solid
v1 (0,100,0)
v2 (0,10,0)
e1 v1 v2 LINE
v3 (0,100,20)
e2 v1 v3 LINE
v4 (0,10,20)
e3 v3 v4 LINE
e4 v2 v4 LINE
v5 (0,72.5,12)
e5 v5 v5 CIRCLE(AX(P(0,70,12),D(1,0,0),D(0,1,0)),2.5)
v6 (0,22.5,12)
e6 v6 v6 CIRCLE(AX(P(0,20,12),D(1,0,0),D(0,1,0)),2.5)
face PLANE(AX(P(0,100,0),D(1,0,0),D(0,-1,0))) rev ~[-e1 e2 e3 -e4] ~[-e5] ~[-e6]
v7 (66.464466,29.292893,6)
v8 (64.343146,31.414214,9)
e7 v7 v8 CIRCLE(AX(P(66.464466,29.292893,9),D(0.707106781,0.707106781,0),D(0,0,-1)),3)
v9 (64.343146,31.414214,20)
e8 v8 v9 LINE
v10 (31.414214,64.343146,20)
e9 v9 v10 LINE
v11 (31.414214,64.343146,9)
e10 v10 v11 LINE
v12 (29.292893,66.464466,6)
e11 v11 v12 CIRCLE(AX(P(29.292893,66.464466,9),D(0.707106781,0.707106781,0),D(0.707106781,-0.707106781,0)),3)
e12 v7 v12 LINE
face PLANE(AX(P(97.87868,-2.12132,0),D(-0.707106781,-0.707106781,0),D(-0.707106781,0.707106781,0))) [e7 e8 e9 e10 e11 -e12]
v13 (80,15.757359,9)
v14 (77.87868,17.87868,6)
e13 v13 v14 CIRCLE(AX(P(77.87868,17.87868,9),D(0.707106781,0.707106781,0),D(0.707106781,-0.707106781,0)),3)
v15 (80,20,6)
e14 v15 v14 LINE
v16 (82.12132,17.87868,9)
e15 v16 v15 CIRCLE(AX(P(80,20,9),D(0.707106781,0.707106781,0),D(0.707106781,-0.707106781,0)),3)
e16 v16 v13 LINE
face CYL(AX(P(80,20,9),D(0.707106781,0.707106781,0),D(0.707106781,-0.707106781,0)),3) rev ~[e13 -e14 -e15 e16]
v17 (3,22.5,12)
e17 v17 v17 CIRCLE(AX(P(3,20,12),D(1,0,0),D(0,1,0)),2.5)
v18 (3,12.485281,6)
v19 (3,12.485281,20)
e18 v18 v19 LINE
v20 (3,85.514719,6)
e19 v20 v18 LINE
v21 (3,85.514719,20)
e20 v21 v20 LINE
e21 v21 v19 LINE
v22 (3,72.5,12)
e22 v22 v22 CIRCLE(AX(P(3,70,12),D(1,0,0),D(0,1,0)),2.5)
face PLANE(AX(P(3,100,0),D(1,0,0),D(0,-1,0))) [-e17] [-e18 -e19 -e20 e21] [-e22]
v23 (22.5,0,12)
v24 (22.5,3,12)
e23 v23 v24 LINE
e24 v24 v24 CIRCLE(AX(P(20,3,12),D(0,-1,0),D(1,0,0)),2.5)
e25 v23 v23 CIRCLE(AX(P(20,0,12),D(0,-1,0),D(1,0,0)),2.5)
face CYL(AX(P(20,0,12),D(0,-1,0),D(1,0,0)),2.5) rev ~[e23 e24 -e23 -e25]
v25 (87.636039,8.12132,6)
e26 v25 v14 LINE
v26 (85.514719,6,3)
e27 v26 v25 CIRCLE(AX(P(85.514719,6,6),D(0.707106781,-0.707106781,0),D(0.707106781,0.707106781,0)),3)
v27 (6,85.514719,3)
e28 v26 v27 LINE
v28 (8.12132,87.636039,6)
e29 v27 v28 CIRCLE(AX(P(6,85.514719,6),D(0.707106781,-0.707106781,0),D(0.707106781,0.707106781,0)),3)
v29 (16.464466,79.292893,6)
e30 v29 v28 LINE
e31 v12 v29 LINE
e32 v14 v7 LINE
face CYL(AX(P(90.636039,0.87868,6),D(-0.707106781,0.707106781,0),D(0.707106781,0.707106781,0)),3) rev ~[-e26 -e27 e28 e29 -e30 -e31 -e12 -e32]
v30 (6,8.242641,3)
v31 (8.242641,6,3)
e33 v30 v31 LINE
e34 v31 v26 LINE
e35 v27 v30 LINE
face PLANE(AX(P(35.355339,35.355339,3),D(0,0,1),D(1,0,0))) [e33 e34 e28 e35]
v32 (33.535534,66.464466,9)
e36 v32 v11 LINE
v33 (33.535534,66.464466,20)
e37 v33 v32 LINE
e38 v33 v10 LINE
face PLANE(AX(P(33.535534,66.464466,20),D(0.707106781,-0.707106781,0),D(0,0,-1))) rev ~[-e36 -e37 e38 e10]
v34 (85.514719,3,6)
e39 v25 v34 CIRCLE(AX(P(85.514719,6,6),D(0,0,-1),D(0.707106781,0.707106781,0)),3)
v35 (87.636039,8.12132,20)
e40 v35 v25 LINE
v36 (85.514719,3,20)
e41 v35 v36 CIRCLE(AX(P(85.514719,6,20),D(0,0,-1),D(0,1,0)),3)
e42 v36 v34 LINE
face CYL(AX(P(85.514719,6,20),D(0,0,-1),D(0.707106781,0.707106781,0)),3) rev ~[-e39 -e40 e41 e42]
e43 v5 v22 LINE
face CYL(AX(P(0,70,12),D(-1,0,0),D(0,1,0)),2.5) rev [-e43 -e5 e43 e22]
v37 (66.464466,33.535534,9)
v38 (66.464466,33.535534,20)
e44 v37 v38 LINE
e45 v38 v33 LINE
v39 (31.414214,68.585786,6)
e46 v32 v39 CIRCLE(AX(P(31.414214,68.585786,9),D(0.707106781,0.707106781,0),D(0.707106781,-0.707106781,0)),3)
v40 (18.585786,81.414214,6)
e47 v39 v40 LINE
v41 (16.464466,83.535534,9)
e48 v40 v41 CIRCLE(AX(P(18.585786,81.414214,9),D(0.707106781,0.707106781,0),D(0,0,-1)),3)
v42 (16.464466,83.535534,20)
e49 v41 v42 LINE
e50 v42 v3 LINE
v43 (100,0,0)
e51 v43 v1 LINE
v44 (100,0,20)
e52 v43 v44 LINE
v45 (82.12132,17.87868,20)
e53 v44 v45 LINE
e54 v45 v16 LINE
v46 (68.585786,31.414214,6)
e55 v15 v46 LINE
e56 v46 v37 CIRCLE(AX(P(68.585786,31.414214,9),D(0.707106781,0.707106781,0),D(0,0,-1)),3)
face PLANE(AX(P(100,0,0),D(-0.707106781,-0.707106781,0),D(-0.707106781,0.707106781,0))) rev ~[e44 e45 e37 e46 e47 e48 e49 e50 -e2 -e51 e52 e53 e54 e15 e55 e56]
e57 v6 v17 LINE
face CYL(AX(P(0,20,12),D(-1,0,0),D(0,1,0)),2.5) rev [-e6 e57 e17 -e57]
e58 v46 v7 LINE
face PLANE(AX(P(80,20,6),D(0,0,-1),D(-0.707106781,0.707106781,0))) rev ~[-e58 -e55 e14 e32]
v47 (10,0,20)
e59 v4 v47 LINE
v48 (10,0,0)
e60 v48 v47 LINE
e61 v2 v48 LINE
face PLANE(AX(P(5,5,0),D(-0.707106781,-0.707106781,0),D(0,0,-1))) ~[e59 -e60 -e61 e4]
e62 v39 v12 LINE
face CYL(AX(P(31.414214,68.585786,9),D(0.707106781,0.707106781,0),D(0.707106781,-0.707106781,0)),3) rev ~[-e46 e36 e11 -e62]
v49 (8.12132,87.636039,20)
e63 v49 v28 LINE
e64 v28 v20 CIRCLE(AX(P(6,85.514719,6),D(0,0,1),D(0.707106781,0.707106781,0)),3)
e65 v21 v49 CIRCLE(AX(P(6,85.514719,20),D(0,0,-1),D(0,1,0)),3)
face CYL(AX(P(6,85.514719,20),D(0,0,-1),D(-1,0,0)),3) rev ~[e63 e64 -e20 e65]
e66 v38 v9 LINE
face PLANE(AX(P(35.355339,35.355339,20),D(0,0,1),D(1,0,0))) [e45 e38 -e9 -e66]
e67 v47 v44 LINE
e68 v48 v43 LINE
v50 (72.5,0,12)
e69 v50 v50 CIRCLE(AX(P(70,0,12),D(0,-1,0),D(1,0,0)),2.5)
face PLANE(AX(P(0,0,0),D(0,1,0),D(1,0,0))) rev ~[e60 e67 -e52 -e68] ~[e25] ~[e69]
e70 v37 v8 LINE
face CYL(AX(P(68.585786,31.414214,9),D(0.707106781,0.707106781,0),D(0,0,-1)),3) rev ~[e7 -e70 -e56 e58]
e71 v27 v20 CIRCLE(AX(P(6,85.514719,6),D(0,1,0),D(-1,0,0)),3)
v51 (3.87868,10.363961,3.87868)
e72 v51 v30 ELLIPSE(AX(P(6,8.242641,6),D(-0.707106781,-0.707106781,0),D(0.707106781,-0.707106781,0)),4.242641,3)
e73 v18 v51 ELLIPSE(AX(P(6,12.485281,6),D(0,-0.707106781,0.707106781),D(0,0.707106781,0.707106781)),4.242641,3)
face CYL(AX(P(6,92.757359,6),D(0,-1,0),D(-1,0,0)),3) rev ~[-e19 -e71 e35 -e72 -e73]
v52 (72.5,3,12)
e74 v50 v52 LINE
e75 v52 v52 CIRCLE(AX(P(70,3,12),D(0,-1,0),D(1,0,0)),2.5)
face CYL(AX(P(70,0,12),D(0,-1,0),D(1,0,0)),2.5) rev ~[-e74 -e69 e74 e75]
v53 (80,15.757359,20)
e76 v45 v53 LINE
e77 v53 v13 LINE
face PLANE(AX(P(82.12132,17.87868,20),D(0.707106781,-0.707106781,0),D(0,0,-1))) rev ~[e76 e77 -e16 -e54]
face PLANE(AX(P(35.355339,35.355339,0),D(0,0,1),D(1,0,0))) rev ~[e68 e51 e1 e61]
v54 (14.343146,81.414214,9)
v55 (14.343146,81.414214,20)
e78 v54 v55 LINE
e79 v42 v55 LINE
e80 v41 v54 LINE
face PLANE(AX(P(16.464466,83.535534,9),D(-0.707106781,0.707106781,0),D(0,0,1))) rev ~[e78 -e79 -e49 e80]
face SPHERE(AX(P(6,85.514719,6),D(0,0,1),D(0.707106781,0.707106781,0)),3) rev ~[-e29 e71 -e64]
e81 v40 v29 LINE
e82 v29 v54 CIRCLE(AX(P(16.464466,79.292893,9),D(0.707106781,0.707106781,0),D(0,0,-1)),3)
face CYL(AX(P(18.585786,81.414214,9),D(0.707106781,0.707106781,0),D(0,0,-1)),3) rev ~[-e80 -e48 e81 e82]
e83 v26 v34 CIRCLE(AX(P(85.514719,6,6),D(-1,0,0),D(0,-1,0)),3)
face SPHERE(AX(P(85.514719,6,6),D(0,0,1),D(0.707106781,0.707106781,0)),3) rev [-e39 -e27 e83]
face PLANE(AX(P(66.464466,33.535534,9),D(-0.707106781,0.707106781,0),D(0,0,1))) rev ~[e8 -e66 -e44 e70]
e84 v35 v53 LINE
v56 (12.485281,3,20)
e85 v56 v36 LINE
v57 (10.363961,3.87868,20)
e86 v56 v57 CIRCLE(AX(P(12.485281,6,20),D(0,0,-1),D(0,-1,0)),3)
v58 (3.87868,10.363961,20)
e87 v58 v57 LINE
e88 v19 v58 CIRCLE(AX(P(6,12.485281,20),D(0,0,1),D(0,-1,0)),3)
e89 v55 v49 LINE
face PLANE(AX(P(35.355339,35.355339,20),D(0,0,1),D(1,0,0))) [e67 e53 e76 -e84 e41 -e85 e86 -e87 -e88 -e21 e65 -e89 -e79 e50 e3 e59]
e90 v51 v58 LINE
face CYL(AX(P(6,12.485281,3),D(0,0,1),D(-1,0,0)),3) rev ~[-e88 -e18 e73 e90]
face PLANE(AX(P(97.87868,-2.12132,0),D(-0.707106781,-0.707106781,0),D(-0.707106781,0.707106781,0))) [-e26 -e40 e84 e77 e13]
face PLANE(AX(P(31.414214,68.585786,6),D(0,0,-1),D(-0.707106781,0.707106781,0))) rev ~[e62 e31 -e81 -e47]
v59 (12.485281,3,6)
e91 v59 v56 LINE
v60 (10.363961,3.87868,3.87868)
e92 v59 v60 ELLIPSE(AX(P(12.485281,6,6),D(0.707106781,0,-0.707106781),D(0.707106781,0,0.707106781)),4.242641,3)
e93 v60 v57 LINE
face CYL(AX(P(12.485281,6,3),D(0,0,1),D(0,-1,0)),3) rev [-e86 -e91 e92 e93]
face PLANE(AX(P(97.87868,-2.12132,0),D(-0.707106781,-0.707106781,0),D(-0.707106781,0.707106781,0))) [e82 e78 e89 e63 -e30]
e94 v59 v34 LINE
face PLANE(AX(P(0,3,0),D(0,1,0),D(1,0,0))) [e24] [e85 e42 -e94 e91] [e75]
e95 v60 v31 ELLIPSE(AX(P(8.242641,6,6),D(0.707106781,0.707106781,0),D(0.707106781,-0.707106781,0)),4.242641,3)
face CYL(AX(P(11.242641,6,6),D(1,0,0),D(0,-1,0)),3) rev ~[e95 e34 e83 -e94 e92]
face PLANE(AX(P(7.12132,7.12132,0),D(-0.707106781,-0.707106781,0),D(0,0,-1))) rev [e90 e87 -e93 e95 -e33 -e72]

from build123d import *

# Parameters (mm, degrees)
F1_DEPTH  = 20
F2_SIZE   = 10
F3_T      = -3
F5_R      = 2.5
F6_DEPTH  = 3
F4_R      = 2.5
F7_DEPTH  = 3
F9_R      = 3
F10_DEPTH = 3


with BuildPart() as f1:
    # F0 (on Top) → F1 (new body)
    with BuildSketch(Plane.XY):
        Polygon((0, 100), (0, 0), (100, 0), align=None)
    extrude(amount=F1_DEPTH)

    # F2
    f2_edges = [f1.edges().sort_by_distance(p)[0] for p in [
        (0, 0, 10),
    ]]
    chamfer(f2_edges, length=F2_SIZE)

    # F3
    f3_openings = [f1.faces().sort_by_distance(p)[0] for p in [
        (33.636364, 33.636364, 20),
    ]]
    offset(amount=F3_T, openings=f3_openings)

    # F5 (on Front) → F6 (cut, through all)
    with BuildSketch(Plane.XZ):
        with Locations((20, 12)):
            Circle(F5_R)
        with Locations((70, 12)):
            Circle(F5_R)
    extrude(amount=-F6_DEPTH, mode=Mode.SUBTRACT)

    # F4 (on Right) → F7 (cut, through all)
    with BuildSketch(Plane.YZ):
        with Locations((20, 12)):
            Circle(F4_R)
        with Locations((70, 12)):
            Circle(F4_R)
    extrude(amount=F7_DEPTH, mode=Mode.SUBTRACT)

    # F9
    f9_edges = [f1.edges().sort_by_distance(p)[0] for p in [
        (3, 52, 3),
        (52, 3, 3),
        (92.757359, 3, 11.5),
        (3, 92.757359, 11.5),
        (47.87868, 47.87868, 3),
        (3, 11.242641, 11.5),
        (11.242641, 3, 11.5),
    ]]
    fillet(f9_edges, radius=F9_R)

    # F8 (on face) → F10 (cut, through all)
    with BuildSketch(Plane(origin=(50, 50, 0), x_dir=(-0.7071067812, 0.7071067812, 0), z_dir=(0.7071067812, 0.7071067812, 0))):
        with BuildLine():
            Line((-23.2842712475, 20), (-45.4264068712, 20))
            Line((-45.4264068712, 20), (-45.4264068712, 9))
            ThreePointArc((-45.4264068712, 9), (-44.5477272148, 6.8786796564), (-42.4264068712, 6))
            Line((-42.4264068712, 6), (-26.2842712475, 6))
            ThreePointArc((-26.2842712475, 6), (-24.1629509039, 6.8786796564), (-23.2842712475, 9))
            Line((-23.2842712475, 9), (-23.2842712475, 20))
        make_face()
        with BuildLine():
            Line((47.4264068712, 20), (23.2842712475, 20))
            Line((23.2842712475, 20), (23.2842712475, 9))
            ThreePointArc((23.2842712475, 9), (24.1629509039, 6.8786796564), (26.2842712475, 6))
            Line((26.2842712475, 6), (44.4264068712, 6))
            ThreePointArc((44.4264068712, 6), (46.5477272148, 6.8786796564), (47.4264068712, 9))
            Line((47.4264068712, 9), (47.4264068712, 20))
        make_face()
    extrude(amount=-F10_DEPTH, mode=Mode.SUBTRACT)


solid = f1.part
